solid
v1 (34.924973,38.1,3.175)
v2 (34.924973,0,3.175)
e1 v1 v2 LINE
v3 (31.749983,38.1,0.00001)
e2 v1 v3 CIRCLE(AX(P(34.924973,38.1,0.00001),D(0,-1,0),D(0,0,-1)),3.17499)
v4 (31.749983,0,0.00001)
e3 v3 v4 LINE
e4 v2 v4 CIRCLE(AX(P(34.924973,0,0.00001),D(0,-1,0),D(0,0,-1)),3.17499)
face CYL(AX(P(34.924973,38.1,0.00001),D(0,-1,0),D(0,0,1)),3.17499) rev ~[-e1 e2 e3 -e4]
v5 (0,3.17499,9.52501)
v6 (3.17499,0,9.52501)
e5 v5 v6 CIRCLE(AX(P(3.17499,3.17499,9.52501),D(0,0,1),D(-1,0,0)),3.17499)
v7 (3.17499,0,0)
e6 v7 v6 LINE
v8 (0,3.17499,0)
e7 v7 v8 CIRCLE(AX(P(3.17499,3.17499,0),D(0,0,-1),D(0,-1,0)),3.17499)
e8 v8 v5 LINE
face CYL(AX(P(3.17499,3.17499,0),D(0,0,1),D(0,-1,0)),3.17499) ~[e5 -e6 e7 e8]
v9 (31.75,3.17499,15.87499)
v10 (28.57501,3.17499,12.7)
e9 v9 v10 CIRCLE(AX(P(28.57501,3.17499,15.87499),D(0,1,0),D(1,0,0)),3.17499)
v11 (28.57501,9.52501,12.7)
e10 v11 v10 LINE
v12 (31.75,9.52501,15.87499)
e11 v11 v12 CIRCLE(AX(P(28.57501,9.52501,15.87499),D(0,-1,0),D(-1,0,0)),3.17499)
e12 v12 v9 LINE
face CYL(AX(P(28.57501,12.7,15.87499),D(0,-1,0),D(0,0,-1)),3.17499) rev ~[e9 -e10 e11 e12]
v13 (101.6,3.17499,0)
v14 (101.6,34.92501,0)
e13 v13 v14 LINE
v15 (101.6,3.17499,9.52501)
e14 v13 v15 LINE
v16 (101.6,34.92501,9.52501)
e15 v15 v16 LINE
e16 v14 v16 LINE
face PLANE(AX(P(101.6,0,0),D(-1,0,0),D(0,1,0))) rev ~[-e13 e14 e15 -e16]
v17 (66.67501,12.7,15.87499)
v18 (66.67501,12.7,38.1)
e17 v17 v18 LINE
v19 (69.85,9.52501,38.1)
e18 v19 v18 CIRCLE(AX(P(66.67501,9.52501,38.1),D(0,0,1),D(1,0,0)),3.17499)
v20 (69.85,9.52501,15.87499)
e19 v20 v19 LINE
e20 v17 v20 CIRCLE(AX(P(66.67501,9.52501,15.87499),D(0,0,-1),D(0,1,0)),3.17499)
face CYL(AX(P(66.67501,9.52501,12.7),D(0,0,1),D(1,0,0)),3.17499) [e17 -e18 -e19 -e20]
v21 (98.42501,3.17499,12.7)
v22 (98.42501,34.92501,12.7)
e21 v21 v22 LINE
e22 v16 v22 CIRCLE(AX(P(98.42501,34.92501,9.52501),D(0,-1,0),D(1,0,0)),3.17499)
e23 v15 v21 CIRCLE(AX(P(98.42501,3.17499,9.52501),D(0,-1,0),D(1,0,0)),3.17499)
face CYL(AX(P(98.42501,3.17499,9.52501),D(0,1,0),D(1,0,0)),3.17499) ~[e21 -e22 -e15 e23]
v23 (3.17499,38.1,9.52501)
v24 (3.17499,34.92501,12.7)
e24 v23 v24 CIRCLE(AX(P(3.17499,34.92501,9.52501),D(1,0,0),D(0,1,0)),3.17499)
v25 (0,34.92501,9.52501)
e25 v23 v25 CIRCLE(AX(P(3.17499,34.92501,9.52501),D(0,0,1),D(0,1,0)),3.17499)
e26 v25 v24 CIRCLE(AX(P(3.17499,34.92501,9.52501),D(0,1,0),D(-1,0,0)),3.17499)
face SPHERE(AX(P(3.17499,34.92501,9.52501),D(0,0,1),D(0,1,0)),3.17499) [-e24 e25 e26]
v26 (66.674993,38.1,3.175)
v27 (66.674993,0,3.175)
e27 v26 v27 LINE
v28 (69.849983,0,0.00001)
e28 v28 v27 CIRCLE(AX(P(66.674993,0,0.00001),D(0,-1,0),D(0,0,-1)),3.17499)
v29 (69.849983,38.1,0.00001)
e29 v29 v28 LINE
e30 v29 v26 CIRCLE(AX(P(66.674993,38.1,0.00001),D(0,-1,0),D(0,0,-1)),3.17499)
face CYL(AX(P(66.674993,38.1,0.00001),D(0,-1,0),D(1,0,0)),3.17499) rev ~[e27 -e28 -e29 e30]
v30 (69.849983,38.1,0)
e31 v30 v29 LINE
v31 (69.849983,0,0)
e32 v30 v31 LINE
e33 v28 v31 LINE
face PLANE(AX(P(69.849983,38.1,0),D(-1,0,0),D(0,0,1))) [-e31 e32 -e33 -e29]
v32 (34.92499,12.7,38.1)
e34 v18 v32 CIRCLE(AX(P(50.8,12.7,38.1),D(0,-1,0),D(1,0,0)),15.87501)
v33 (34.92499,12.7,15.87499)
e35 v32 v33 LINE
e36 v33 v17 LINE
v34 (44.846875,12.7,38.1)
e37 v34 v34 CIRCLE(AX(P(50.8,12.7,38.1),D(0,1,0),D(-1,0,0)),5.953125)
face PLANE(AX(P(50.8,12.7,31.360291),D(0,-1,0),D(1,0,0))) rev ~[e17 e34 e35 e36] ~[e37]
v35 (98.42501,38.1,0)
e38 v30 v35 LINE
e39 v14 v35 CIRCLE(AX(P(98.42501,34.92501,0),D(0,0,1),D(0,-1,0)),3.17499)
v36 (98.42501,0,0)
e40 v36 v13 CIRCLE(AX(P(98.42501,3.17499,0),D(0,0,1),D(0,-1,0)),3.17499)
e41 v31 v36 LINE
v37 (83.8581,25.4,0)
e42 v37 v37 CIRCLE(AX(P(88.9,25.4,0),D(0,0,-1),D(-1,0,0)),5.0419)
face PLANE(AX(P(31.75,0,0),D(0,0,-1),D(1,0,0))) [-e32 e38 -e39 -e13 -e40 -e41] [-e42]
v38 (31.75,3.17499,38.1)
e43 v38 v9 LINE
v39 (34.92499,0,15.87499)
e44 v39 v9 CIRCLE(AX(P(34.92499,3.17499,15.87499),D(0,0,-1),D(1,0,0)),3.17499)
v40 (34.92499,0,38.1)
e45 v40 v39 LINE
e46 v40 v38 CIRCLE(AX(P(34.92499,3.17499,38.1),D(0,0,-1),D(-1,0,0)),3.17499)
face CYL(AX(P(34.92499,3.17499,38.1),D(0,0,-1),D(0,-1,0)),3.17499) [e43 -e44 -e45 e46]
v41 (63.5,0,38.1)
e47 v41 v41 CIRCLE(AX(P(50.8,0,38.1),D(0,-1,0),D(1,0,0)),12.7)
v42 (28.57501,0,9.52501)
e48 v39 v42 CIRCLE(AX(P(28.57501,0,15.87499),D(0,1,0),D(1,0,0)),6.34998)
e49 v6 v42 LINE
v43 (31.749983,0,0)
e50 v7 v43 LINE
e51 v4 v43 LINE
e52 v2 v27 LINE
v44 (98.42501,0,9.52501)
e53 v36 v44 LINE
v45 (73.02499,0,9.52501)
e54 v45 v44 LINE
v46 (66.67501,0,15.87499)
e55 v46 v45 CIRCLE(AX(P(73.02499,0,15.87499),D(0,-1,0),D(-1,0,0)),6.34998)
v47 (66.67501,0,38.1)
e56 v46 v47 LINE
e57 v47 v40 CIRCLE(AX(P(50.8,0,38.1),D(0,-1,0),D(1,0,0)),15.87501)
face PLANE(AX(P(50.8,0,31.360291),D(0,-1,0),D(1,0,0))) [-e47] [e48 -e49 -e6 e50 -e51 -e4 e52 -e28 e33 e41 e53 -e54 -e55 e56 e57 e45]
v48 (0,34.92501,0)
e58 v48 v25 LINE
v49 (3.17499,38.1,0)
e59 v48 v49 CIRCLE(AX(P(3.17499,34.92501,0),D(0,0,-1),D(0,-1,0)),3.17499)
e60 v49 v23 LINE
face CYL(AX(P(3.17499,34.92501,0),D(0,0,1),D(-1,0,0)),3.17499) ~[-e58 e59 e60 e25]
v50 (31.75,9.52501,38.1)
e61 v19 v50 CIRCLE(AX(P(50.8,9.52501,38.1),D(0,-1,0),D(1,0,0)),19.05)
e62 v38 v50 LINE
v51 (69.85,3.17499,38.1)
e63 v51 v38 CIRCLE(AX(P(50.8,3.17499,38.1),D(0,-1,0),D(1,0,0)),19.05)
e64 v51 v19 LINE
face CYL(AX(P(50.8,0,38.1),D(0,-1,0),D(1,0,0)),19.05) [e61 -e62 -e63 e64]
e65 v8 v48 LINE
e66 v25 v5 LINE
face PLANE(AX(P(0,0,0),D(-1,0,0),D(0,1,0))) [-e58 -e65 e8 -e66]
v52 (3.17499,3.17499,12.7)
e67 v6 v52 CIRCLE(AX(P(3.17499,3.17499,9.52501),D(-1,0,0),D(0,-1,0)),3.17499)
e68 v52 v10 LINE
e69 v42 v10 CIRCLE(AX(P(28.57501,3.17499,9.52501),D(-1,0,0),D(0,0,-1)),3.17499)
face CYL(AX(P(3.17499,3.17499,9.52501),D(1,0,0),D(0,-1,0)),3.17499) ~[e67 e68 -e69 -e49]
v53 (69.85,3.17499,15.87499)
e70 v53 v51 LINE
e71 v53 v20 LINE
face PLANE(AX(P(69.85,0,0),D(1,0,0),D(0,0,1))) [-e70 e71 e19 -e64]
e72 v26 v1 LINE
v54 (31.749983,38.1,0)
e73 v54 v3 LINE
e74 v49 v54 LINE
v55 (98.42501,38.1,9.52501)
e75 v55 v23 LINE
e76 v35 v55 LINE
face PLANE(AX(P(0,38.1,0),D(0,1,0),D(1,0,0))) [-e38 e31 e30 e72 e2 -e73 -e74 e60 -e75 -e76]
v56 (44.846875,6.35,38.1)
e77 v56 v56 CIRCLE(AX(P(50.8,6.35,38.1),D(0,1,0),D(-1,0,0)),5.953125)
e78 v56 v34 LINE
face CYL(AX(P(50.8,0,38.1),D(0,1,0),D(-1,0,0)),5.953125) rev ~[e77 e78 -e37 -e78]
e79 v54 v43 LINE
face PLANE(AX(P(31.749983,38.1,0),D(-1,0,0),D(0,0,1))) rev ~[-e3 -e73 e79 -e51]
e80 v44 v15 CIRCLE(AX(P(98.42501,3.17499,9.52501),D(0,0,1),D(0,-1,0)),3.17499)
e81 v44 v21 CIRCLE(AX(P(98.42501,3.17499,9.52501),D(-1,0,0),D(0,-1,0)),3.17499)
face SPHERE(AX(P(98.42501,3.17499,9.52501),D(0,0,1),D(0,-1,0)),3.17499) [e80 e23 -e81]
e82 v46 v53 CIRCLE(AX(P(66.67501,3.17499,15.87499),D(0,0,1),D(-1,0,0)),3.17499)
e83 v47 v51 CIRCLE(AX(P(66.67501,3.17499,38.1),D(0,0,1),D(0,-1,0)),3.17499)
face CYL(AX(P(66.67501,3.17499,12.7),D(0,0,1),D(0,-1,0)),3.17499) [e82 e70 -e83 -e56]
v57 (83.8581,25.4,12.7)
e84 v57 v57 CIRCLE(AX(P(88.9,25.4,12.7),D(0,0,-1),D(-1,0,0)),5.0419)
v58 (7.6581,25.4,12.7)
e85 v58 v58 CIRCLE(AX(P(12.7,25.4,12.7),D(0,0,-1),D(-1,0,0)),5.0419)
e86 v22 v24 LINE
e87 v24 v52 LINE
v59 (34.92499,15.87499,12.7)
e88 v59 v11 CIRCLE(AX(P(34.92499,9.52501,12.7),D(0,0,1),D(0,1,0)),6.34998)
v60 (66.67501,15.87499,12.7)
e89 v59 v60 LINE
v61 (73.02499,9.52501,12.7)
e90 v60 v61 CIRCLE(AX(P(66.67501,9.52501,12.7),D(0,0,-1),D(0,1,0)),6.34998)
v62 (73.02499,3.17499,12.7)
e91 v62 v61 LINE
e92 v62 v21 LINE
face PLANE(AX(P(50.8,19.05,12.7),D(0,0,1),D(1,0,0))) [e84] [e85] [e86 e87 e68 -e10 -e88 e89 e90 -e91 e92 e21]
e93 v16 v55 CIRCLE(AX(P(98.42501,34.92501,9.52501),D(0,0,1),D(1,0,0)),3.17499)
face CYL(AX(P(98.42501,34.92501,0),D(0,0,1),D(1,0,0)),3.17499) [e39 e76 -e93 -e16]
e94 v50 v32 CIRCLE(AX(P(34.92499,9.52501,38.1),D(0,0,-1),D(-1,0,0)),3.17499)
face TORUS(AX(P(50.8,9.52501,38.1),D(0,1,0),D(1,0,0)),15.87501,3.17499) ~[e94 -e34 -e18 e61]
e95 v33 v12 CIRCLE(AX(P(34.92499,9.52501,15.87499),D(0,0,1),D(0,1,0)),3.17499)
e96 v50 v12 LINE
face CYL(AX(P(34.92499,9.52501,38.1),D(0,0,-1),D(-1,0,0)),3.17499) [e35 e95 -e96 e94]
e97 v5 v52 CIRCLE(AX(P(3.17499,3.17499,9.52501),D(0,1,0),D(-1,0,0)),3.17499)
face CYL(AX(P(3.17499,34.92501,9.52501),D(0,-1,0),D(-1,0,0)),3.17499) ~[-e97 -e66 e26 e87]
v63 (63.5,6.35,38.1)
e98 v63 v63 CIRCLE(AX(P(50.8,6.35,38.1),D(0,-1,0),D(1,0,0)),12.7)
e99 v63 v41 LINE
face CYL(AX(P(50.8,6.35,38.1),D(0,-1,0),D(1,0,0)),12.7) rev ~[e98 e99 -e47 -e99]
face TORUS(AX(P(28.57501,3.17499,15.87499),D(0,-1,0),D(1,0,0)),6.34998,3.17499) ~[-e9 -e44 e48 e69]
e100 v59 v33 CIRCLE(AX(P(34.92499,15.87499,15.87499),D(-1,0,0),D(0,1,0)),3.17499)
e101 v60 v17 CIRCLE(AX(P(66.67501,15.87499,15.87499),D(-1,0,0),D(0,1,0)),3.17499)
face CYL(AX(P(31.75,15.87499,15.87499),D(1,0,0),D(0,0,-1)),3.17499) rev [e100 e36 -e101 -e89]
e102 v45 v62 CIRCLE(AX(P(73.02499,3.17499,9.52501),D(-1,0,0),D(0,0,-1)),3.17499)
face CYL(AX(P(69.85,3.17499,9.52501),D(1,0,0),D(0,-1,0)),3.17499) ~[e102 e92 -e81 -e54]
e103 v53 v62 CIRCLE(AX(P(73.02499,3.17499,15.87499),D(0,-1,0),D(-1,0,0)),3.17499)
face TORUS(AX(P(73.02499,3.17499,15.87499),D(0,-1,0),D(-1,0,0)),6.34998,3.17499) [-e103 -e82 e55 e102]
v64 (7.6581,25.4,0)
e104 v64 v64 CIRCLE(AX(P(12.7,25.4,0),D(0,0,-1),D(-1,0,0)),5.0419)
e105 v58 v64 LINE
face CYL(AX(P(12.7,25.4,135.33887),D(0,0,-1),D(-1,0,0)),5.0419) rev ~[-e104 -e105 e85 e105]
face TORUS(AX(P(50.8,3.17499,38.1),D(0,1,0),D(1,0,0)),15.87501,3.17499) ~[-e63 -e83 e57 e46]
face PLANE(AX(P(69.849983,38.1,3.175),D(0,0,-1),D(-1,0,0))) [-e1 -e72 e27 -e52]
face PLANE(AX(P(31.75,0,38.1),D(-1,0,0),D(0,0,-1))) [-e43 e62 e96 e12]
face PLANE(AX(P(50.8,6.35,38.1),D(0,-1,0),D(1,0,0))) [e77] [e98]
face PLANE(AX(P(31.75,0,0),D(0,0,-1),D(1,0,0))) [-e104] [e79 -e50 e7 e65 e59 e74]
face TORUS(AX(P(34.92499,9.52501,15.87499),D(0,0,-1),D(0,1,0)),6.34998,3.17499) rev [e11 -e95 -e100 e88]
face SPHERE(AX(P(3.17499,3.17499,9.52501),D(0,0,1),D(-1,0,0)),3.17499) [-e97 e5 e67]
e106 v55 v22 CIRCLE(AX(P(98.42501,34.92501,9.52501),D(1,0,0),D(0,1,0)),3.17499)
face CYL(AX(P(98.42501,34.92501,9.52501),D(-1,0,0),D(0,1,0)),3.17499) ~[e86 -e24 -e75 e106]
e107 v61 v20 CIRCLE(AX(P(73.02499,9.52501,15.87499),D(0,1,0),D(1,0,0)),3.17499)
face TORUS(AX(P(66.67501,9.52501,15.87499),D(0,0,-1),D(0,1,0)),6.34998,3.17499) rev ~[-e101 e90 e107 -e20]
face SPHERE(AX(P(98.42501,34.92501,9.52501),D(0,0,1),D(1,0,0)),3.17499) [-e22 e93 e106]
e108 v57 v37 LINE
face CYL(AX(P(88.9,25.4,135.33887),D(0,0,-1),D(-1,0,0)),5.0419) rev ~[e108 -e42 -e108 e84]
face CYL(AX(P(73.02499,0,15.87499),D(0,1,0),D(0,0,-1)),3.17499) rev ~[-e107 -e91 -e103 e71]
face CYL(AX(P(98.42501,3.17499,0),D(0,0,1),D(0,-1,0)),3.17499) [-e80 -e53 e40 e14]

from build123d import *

# Parameters (mm, degrees)
F0_W           = 101.6
F0_H           = 38.1
F1_DEPTH       = 12.7
F2_W           = 38.1
F2_H           = 12.7
F3_DEPTH       = 12.7
F4_D           = 11.90625
F4_CBORE_D     = 25.4
F4_CBORE_DEPTH = 6.35
F5_W           = 38.1
F5_H           = 3.175
F6_DEPTH       = 38.101
F8_D           = 10.0838
F9_R           = 3.17499
F10_R          = 3.17499


# Not quite as in the source:
# - a fillet or chamfer is up to 0.001 mm smaller than in the source, because OpenCascade refuses the exact size
# - a length typed as a fraction of an inch, garbled in the dataset ("3 / 203.2 mm" for 3/8 in), is restored


with BuildPart() as f1:
    # F0 (on Top) → F1 (new body)
    with BuildSketch(Plane.XY):
        with Locations((50.8, 19.05)):
            Rectangle(F0_W, F0_H)
    extrude(amount=F1_DEPTH)

    # F2 (on face) → F3 (join)
    with BuildSketch(Plane.XZ):
        with BuildLine():
            Line((31.75, 38.1), (31.75, 12.7))
            Line((31.75, 12.7), (69.85, 12.7))
            Line((69.85, 12.7), (69.85, 38.1))
            ThreePointArc((69.85, 38.1), (50.8, 57.15), (31.75, 38.1))
        make_face()
        with Locations((50.8, 6.35)):
            Rectangle(F2_W, F2_H)
    extrude(amount=-F3_DEPTH)

    # F4 (through all)
    with Locations(Plane.XZ):
        with Locations((50.8, 38.1)):
            CounterBoreHole(F4_D / 2, F4_CBORE_D / 2, F4_CBORE_DEPTH)

    # F5 (on face) → F6 (cut, through all)
    with BuildSketch(Plane(origin=(0, 38.1, 0), x_dir=(-1, 0, 0), z_dir=(0, 1, 0))):
        with Locations((-50.7999828577, 1.5875)):
            Rectangle(F5_W, F5_H)
    extrude(amount=-F6_DEPTH, mode=Mode.SUBTRACT)

    # F8 (through all)
    with Locations(Plane.XY.offset(12.7)):
        with Locations((12.7, 25.4), (88.9, 25.4)):
            Hole(F8_D / 2)

    # F9 (radius 3.175 in the source; OpenCascade refuses exactly that, so slightly less here)
    f9_edges = [f1.edges().sort_by_distance(p)[0] for p in [
        (0, 0, 6.35),
        (101.6, 0, 6.35),
        (101.6, 38.1, 6.35),
        (0, 38.1, 6.35),
        (31.749983, 19.05, 3.175),
        (69.849983, 19.05, 3.175),
    ]]
    fillet(f9_edges, radius=F9_R)

    # F10 (radius 3.175 in the source; OpenCascade refuses exactly that, so slightly less here)
    f10_edges = [f1.edges().sort_by_distance(p)[0] for p in [
        (50.8, 0, 57.15),
        (50.8, 12.7, 57.15),
        (31.75, 0, 25.4),
        (69.85, 0, 25.4),
        (31.75, 12.7, 25.4),
        (17.462495, 0, 12.7),
        (0.929933, 0.929933, 12.7),
        (0, 19.05, 12.7),
        (0.929933, 37.170067, 12.7),
        (50.8, 38.1, 12.7),
        (100.670067, 37.170067, 12.7),
        (101.6, 19.05, 12.7),
        (100.670067, 0.929933, 12.7),
        (84.137505, 0, 12.7),
        (50.8, 12.7, 12.7),
        (31.75, 6.35, 12.7),
        (69.85, 12.7, 25.4),
        (69.85, 6.35, 12.7),
    ]]
    fillet(f10_edges, radius=F10_R)


solid = f1.part
